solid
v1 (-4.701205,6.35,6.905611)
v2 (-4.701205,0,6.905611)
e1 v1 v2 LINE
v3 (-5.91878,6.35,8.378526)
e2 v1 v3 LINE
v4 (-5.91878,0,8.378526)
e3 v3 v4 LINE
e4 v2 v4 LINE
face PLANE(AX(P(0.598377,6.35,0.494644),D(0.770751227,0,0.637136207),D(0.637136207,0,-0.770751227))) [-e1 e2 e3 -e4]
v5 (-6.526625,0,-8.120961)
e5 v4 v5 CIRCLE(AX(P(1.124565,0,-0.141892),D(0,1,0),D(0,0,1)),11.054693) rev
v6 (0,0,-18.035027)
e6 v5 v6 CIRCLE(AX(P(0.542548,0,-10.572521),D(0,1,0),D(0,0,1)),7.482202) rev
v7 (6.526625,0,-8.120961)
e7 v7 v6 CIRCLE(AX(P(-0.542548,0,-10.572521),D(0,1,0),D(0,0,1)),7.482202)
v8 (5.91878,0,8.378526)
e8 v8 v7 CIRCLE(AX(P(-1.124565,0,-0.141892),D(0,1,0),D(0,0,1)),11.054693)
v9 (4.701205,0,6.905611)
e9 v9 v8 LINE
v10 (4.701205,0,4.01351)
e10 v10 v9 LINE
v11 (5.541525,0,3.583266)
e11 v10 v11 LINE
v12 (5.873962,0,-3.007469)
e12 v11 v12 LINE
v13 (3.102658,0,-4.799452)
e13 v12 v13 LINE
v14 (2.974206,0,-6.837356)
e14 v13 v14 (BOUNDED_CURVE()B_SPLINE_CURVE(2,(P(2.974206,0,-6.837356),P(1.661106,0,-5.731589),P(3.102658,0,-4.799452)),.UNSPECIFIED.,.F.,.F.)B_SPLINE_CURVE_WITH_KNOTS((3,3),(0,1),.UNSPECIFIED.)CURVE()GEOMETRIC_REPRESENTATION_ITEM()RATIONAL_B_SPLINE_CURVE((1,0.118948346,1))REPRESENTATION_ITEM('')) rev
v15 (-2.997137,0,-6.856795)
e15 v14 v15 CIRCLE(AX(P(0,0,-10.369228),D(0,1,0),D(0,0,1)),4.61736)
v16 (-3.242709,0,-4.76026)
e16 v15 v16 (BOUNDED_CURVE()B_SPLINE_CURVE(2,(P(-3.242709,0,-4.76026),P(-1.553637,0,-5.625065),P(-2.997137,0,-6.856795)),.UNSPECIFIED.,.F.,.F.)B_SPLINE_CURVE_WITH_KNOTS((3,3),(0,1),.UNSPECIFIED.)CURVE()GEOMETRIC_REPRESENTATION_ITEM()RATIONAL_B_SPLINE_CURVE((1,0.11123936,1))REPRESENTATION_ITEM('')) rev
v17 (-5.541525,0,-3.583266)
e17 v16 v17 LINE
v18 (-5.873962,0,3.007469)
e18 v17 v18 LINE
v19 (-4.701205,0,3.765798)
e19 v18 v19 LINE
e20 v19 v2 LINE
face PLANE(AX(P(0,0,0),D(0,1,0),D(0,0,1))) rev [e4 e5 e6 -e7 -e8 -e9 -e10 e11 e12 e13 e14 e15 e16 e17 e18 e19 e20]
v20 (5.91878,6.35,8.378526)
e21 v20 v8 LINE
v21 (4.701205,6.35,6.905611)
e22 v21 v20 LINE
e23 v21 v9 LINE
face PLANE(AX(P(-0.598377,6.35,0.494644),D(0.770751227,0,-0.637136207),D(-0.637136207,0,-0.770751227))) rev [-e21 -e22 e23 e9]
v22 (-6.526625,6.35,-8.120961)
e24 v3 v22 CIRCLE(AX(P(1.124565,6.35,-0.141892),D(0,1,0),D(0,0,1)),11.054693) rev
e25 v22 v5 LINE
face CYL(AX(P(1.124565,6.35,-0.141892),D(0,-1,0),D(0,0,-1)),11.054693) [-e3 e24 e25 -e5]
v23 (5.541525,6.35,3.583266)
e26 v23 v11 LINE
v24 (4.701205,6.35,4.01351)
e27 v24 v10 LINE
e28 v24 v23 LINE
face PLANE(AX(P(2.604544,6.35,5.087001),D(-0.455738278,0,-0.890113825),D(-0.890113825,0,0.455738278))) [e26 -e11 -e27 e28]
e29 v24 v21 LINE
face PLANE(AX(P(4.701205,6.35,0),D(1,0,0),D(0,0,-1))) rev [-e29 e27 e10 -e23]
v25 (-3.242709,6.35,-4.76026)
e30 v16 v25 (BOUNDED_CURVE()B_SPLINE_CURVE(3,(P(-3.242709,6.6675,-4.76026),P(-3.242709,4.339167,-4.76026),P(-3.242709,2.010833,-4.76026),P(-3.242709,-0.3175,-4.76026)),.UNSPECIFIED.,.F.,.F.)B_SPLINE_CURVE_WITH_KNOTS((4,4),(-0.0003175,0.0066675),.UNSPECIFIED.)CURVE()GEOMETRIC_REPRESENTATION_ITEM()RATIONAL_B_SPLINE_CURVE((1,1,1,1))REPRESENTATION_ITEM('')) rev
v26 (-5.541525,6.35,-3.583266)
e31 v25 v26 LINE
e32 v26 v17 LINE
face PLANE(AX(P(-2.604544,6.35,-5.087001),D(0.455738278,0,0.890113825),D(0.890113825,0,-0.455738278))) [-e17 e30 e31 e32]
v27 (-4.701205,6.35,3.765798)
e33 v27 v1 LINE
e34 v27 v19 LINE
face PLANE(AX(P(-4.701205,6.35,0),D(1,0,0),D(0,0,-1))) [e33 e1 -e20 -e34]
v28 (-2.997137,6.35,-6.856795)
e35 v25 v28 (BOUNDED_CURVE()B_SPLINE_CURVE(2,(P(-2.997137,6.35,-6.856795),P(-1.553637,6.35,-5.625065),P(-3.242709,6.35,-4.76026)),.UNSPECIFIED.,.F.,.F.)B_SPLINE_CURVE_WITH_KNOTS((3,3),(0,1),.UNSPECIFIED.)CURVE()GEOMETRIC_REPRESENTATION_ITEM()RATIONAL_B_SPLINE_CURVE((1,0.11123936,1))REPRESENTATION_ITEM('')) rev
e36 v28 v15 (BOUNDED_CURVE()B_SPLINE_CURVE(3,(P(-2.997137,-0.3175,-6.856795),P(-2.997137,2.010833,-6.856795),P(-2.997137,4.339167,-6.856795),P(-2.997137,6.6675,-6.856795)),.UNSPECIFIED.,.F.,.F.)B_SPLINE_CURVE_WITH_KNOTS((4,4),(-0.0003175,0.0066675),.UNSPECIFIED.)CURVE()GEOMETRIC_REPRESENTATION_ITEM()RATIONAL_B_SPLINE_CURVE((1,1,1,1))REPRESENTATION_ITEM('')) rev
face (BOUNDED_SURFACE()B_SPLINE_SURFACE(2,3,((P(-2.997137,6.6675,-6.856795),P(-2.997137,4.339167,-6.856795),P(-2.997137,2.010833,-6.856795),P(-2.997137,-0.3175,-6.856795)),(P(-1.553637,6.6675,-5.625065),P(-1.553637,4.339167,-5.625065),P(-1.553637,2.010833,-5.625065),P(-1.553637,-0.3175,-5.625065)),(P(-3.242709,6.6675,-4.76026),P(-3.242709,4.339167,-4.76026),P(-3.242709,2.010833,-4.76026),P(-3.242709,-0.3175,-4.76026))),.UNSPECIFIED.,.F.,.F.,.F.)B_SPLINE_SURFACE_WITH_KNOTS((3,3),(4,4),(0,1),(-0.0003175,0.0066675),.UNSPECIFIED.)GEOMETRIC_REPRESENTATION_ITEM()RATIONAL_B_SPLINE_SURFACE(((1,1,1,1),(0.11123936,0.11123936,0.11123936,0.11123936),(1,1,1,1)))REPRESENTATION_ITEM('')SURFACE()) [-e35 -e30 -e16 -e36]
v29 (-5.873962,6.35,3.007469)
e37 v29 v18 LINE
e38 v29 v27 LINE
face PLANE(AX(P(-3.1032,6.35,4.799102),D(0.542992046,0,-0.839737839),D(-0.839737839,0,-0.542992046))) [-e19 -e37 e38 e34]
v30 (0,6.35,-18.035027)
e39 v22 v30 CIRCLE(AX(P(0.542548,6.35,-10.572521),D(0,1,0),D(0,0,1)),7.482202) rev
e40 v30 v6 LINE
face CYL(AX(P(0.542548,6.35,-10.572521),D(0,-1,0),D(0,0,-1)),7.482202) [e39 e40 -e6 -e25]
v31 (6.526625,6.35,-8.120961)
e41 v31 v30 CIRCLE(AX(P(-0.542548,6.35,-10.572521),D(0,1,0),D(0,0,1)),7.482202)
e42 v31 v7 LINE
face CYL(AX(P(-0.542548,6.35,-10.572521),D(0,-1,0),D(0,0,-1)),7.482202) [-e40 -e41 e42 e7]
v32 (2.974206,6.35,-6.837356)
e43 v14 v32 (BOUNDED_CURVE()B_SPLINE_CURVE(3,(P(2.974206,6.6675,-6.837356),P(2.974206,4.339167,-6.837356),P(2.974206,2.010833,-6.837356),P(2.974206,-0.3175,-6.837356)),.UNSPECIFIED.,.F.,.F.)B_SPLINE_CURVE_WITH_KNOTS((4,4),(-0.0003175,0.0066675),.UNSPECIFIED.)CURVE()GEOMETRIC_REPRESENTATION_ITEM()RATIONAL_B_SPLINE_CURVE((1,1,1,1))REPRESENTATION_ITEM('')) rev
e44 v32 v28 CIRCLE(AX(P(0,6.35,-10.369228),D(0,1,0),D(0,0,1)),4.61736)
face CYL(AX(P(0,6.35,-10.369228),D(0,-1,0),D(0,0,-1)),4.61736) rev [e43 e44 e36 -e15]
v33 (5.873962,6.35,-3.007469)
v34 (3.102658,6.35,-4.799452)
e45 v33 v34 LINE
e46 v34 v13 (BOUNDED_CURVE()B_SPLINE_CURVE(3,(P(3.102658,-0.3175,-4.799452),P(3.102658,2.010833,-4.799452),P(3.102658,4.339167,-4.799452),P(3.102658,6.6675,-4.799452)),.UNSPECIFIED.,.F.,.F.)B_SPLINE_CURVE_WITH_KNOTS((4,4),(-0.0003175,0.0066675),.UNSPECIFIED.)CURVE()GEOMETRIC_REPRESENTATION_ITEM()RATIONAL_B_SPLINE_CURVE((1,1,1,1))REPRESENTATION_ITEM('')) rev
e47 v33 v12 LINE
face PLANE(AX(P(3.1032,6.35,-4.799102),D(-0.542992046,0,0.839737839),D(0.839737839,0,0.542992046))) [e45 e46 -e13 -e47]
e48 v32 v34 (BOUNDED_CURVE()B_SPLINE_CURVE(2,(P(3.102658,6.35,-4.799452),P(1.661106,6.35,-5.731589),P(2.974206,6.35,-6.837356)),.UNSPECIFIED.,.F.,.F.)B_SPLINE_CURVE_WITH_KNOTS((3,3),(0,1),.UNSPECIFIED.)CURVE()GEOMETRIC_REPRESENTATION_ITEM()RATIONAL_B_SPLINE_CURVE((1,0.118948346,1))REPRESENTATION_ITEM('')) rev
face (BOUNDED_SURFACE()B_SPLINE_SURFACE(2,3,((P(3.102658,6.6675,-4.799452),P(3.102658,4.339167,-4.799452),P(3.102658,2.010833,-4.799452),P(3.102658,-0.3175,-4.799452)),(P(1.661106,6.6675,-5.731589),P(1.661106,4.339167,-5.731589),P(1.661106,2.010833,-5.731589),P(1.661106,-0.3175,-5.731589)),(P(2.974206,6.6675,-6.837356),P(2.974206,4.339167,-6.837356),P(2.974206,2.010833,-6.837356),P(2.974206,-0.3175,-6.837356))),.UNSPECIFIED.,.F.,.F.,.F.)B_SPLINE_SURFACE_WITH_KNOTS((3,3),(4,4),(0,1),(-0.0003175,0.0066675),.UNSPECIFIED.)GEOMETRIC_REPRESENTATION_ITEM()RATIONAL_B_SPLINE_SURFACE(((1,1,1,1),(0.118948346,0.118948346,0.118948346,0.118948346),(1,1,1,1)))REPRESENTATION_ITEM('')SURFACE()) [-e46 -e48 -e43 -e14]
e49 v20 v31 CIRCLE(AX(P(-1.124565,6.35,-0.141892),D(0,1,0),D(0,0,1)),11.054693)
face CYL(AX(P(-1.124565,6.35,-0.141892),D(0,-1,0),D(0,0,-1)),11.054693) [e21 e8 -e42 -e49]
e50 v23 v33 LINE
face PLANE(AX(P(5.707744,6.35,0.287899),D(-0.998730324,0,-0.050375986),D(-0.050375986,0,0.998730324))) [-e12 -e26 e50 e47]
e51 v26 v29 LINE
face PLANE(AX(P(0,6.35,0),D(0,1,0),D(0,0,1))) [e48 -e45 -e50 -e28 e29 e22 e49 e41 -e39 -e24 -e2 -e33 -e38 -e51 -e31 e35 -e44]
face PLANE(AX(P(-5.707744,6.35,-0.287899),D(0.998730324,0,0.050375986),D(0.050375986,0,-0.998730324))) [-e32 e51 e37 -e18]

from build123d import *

# Parameters (mm, degrees)
BOSS_EXTRUDE1_DEPTH = 6.35


with BuildPart() as part:
    # Sketch3 → Boss-Extrude1 (new body)
    with BuildSketch(Plane(origin=(0, 0, 0), x_dir=(1, 0, 0), z_dir=(0, 1, 0))):
        with BuildLine():
            Line((-5.541525375, 3.58326618), (-2.47962532, 5.150959008))
            Line((-2.47962532, 5.150959008), (-2.47962532, 6.474170352))
            ThreePointArc((-2.47962532, 6.474170352), (-2.221563685, 14.417025562), (4.617359972, 10.369227654))
            ThreePointArc((4.617359972, 10.369227654), (4.047797908, 8.147663968), (2.47962532, 6.474170352))
            Line((2.47962532, 6.474170352), (2.47962532, 5.20231788))
            Line((2.47962532, 5.20231788), (5.873962228, 3.007468661))
            Line((5.873962228, 3.007468661), (5.541525375, -3.58326618))
            Line((5.541525375, -3.58326618), (4.701204968, -4.013510228))
            Line((4.701204968, -4.013510228), (4.701204968, -6.905610932))
            Line((4.701204968, -6.905610932), (5.918780254, -8.378526195))
            ThreePointArc((5.918780254, -8.378526195), (9.922634137, -0.265088751), (6.526624698, 8.120961152))
            ThreePointArc((6.526624698, 8.120961152), (5.706991897, 14.686716316), (0, 18.035026682))
            ThreePointArc((0, 18.035026682), (-5.706991897, 14.686716316), (-6.526624698, 8.120961152))
            ThreePointArc((-6.526624698, 8.120961152), (-9.922634137, -0.265088751), (-5.918780254, -8.378526195))
            Line((-5.918780254, -8.378526195), (-4.701204968, -6.905610932))
            Line((-4.701204968, -6.905610932), (-4.701204968, -3.765798027))
            Line((-4.701204968, -3.765798027), (-5.873962228, -3.007468661))
            Line((-5.873962228, -3.007468661), (-5.541525375, 3.58326618))
        make_face()
        with BuildLine():
            Line((-2.47962532, 6.474170352), (-2.47962532, 5.150959008))
            Line((-2.47962532, 5.150959008), (-1.063503338, 5.876013463))
            ThreePointArc((-1.063503338, 5.876013463), (-1.79663243, 6.115743784), (-2.47962532, 6.474170352))
        make_face()
        with BuildLine():
            ThreePointArc((2.47962532, 6.474170352), (1.921985685, 6.17089654), (1.328021538, 5.946968965))
            Line((1.328021538, 5.946968965), (2.47962532, 5.20231788))
            Line((2.47962532, 5.20231788), (2.47962532, 6.474170352))
        make_face()
    extrude(amount=BOSS_EXTRUDE1_DEPTH)

    # Fillet6
    # a fillet whose section is not a circle: 1.27 mm, written as the material it takes off along each edge
    with BuildSketch(Plane(origin=(1.328021538, -5.283304691, -5.946968965), x_dir=(0.8397378391322112, 0, 0.5429920455490709), z_dir=(0, 1, 0))) as fillet6_piece_1:
        with BuildLine():
            Bezier((2.113321876, 0), (0.3966534, 0), (0.898889741, 1.641556979), weights=[1, 0.118948346, 1])
            ThreePointArc((0.898889741, 1.641556979), (0.533488386, 0.774757636), (0, 0))
            Line((0, 0), (2.113321876, 0))
        make_face()
    extrude(amount=16.916609382, mode=Mode.SUBTRACT)
    with BuildSketch(Plane(origin=(-1.063503338, -6.120582224, -5.876013463), x_dir=(-0.891835980226881, 0, -0.4523589110128793), z_dir=(0, 1, 0))) as fillet6_piece_2:
        with BuildLine():
            Bezier((2.168149873, 0), (0.323600022, 0.445521101), (1.438773255, 1.980852292), weights=[1, 0.11123936, 1])
            Line((1.438773255, 1.980852292), (0, 0))
            ThreePointArc((0, 0), (1.084074937, 0.129064678), (2.168149873, 0))
        make_face()
    extrude(amount=18.591164449, mode=Mode.SUBTRACT)


solid = part.part
